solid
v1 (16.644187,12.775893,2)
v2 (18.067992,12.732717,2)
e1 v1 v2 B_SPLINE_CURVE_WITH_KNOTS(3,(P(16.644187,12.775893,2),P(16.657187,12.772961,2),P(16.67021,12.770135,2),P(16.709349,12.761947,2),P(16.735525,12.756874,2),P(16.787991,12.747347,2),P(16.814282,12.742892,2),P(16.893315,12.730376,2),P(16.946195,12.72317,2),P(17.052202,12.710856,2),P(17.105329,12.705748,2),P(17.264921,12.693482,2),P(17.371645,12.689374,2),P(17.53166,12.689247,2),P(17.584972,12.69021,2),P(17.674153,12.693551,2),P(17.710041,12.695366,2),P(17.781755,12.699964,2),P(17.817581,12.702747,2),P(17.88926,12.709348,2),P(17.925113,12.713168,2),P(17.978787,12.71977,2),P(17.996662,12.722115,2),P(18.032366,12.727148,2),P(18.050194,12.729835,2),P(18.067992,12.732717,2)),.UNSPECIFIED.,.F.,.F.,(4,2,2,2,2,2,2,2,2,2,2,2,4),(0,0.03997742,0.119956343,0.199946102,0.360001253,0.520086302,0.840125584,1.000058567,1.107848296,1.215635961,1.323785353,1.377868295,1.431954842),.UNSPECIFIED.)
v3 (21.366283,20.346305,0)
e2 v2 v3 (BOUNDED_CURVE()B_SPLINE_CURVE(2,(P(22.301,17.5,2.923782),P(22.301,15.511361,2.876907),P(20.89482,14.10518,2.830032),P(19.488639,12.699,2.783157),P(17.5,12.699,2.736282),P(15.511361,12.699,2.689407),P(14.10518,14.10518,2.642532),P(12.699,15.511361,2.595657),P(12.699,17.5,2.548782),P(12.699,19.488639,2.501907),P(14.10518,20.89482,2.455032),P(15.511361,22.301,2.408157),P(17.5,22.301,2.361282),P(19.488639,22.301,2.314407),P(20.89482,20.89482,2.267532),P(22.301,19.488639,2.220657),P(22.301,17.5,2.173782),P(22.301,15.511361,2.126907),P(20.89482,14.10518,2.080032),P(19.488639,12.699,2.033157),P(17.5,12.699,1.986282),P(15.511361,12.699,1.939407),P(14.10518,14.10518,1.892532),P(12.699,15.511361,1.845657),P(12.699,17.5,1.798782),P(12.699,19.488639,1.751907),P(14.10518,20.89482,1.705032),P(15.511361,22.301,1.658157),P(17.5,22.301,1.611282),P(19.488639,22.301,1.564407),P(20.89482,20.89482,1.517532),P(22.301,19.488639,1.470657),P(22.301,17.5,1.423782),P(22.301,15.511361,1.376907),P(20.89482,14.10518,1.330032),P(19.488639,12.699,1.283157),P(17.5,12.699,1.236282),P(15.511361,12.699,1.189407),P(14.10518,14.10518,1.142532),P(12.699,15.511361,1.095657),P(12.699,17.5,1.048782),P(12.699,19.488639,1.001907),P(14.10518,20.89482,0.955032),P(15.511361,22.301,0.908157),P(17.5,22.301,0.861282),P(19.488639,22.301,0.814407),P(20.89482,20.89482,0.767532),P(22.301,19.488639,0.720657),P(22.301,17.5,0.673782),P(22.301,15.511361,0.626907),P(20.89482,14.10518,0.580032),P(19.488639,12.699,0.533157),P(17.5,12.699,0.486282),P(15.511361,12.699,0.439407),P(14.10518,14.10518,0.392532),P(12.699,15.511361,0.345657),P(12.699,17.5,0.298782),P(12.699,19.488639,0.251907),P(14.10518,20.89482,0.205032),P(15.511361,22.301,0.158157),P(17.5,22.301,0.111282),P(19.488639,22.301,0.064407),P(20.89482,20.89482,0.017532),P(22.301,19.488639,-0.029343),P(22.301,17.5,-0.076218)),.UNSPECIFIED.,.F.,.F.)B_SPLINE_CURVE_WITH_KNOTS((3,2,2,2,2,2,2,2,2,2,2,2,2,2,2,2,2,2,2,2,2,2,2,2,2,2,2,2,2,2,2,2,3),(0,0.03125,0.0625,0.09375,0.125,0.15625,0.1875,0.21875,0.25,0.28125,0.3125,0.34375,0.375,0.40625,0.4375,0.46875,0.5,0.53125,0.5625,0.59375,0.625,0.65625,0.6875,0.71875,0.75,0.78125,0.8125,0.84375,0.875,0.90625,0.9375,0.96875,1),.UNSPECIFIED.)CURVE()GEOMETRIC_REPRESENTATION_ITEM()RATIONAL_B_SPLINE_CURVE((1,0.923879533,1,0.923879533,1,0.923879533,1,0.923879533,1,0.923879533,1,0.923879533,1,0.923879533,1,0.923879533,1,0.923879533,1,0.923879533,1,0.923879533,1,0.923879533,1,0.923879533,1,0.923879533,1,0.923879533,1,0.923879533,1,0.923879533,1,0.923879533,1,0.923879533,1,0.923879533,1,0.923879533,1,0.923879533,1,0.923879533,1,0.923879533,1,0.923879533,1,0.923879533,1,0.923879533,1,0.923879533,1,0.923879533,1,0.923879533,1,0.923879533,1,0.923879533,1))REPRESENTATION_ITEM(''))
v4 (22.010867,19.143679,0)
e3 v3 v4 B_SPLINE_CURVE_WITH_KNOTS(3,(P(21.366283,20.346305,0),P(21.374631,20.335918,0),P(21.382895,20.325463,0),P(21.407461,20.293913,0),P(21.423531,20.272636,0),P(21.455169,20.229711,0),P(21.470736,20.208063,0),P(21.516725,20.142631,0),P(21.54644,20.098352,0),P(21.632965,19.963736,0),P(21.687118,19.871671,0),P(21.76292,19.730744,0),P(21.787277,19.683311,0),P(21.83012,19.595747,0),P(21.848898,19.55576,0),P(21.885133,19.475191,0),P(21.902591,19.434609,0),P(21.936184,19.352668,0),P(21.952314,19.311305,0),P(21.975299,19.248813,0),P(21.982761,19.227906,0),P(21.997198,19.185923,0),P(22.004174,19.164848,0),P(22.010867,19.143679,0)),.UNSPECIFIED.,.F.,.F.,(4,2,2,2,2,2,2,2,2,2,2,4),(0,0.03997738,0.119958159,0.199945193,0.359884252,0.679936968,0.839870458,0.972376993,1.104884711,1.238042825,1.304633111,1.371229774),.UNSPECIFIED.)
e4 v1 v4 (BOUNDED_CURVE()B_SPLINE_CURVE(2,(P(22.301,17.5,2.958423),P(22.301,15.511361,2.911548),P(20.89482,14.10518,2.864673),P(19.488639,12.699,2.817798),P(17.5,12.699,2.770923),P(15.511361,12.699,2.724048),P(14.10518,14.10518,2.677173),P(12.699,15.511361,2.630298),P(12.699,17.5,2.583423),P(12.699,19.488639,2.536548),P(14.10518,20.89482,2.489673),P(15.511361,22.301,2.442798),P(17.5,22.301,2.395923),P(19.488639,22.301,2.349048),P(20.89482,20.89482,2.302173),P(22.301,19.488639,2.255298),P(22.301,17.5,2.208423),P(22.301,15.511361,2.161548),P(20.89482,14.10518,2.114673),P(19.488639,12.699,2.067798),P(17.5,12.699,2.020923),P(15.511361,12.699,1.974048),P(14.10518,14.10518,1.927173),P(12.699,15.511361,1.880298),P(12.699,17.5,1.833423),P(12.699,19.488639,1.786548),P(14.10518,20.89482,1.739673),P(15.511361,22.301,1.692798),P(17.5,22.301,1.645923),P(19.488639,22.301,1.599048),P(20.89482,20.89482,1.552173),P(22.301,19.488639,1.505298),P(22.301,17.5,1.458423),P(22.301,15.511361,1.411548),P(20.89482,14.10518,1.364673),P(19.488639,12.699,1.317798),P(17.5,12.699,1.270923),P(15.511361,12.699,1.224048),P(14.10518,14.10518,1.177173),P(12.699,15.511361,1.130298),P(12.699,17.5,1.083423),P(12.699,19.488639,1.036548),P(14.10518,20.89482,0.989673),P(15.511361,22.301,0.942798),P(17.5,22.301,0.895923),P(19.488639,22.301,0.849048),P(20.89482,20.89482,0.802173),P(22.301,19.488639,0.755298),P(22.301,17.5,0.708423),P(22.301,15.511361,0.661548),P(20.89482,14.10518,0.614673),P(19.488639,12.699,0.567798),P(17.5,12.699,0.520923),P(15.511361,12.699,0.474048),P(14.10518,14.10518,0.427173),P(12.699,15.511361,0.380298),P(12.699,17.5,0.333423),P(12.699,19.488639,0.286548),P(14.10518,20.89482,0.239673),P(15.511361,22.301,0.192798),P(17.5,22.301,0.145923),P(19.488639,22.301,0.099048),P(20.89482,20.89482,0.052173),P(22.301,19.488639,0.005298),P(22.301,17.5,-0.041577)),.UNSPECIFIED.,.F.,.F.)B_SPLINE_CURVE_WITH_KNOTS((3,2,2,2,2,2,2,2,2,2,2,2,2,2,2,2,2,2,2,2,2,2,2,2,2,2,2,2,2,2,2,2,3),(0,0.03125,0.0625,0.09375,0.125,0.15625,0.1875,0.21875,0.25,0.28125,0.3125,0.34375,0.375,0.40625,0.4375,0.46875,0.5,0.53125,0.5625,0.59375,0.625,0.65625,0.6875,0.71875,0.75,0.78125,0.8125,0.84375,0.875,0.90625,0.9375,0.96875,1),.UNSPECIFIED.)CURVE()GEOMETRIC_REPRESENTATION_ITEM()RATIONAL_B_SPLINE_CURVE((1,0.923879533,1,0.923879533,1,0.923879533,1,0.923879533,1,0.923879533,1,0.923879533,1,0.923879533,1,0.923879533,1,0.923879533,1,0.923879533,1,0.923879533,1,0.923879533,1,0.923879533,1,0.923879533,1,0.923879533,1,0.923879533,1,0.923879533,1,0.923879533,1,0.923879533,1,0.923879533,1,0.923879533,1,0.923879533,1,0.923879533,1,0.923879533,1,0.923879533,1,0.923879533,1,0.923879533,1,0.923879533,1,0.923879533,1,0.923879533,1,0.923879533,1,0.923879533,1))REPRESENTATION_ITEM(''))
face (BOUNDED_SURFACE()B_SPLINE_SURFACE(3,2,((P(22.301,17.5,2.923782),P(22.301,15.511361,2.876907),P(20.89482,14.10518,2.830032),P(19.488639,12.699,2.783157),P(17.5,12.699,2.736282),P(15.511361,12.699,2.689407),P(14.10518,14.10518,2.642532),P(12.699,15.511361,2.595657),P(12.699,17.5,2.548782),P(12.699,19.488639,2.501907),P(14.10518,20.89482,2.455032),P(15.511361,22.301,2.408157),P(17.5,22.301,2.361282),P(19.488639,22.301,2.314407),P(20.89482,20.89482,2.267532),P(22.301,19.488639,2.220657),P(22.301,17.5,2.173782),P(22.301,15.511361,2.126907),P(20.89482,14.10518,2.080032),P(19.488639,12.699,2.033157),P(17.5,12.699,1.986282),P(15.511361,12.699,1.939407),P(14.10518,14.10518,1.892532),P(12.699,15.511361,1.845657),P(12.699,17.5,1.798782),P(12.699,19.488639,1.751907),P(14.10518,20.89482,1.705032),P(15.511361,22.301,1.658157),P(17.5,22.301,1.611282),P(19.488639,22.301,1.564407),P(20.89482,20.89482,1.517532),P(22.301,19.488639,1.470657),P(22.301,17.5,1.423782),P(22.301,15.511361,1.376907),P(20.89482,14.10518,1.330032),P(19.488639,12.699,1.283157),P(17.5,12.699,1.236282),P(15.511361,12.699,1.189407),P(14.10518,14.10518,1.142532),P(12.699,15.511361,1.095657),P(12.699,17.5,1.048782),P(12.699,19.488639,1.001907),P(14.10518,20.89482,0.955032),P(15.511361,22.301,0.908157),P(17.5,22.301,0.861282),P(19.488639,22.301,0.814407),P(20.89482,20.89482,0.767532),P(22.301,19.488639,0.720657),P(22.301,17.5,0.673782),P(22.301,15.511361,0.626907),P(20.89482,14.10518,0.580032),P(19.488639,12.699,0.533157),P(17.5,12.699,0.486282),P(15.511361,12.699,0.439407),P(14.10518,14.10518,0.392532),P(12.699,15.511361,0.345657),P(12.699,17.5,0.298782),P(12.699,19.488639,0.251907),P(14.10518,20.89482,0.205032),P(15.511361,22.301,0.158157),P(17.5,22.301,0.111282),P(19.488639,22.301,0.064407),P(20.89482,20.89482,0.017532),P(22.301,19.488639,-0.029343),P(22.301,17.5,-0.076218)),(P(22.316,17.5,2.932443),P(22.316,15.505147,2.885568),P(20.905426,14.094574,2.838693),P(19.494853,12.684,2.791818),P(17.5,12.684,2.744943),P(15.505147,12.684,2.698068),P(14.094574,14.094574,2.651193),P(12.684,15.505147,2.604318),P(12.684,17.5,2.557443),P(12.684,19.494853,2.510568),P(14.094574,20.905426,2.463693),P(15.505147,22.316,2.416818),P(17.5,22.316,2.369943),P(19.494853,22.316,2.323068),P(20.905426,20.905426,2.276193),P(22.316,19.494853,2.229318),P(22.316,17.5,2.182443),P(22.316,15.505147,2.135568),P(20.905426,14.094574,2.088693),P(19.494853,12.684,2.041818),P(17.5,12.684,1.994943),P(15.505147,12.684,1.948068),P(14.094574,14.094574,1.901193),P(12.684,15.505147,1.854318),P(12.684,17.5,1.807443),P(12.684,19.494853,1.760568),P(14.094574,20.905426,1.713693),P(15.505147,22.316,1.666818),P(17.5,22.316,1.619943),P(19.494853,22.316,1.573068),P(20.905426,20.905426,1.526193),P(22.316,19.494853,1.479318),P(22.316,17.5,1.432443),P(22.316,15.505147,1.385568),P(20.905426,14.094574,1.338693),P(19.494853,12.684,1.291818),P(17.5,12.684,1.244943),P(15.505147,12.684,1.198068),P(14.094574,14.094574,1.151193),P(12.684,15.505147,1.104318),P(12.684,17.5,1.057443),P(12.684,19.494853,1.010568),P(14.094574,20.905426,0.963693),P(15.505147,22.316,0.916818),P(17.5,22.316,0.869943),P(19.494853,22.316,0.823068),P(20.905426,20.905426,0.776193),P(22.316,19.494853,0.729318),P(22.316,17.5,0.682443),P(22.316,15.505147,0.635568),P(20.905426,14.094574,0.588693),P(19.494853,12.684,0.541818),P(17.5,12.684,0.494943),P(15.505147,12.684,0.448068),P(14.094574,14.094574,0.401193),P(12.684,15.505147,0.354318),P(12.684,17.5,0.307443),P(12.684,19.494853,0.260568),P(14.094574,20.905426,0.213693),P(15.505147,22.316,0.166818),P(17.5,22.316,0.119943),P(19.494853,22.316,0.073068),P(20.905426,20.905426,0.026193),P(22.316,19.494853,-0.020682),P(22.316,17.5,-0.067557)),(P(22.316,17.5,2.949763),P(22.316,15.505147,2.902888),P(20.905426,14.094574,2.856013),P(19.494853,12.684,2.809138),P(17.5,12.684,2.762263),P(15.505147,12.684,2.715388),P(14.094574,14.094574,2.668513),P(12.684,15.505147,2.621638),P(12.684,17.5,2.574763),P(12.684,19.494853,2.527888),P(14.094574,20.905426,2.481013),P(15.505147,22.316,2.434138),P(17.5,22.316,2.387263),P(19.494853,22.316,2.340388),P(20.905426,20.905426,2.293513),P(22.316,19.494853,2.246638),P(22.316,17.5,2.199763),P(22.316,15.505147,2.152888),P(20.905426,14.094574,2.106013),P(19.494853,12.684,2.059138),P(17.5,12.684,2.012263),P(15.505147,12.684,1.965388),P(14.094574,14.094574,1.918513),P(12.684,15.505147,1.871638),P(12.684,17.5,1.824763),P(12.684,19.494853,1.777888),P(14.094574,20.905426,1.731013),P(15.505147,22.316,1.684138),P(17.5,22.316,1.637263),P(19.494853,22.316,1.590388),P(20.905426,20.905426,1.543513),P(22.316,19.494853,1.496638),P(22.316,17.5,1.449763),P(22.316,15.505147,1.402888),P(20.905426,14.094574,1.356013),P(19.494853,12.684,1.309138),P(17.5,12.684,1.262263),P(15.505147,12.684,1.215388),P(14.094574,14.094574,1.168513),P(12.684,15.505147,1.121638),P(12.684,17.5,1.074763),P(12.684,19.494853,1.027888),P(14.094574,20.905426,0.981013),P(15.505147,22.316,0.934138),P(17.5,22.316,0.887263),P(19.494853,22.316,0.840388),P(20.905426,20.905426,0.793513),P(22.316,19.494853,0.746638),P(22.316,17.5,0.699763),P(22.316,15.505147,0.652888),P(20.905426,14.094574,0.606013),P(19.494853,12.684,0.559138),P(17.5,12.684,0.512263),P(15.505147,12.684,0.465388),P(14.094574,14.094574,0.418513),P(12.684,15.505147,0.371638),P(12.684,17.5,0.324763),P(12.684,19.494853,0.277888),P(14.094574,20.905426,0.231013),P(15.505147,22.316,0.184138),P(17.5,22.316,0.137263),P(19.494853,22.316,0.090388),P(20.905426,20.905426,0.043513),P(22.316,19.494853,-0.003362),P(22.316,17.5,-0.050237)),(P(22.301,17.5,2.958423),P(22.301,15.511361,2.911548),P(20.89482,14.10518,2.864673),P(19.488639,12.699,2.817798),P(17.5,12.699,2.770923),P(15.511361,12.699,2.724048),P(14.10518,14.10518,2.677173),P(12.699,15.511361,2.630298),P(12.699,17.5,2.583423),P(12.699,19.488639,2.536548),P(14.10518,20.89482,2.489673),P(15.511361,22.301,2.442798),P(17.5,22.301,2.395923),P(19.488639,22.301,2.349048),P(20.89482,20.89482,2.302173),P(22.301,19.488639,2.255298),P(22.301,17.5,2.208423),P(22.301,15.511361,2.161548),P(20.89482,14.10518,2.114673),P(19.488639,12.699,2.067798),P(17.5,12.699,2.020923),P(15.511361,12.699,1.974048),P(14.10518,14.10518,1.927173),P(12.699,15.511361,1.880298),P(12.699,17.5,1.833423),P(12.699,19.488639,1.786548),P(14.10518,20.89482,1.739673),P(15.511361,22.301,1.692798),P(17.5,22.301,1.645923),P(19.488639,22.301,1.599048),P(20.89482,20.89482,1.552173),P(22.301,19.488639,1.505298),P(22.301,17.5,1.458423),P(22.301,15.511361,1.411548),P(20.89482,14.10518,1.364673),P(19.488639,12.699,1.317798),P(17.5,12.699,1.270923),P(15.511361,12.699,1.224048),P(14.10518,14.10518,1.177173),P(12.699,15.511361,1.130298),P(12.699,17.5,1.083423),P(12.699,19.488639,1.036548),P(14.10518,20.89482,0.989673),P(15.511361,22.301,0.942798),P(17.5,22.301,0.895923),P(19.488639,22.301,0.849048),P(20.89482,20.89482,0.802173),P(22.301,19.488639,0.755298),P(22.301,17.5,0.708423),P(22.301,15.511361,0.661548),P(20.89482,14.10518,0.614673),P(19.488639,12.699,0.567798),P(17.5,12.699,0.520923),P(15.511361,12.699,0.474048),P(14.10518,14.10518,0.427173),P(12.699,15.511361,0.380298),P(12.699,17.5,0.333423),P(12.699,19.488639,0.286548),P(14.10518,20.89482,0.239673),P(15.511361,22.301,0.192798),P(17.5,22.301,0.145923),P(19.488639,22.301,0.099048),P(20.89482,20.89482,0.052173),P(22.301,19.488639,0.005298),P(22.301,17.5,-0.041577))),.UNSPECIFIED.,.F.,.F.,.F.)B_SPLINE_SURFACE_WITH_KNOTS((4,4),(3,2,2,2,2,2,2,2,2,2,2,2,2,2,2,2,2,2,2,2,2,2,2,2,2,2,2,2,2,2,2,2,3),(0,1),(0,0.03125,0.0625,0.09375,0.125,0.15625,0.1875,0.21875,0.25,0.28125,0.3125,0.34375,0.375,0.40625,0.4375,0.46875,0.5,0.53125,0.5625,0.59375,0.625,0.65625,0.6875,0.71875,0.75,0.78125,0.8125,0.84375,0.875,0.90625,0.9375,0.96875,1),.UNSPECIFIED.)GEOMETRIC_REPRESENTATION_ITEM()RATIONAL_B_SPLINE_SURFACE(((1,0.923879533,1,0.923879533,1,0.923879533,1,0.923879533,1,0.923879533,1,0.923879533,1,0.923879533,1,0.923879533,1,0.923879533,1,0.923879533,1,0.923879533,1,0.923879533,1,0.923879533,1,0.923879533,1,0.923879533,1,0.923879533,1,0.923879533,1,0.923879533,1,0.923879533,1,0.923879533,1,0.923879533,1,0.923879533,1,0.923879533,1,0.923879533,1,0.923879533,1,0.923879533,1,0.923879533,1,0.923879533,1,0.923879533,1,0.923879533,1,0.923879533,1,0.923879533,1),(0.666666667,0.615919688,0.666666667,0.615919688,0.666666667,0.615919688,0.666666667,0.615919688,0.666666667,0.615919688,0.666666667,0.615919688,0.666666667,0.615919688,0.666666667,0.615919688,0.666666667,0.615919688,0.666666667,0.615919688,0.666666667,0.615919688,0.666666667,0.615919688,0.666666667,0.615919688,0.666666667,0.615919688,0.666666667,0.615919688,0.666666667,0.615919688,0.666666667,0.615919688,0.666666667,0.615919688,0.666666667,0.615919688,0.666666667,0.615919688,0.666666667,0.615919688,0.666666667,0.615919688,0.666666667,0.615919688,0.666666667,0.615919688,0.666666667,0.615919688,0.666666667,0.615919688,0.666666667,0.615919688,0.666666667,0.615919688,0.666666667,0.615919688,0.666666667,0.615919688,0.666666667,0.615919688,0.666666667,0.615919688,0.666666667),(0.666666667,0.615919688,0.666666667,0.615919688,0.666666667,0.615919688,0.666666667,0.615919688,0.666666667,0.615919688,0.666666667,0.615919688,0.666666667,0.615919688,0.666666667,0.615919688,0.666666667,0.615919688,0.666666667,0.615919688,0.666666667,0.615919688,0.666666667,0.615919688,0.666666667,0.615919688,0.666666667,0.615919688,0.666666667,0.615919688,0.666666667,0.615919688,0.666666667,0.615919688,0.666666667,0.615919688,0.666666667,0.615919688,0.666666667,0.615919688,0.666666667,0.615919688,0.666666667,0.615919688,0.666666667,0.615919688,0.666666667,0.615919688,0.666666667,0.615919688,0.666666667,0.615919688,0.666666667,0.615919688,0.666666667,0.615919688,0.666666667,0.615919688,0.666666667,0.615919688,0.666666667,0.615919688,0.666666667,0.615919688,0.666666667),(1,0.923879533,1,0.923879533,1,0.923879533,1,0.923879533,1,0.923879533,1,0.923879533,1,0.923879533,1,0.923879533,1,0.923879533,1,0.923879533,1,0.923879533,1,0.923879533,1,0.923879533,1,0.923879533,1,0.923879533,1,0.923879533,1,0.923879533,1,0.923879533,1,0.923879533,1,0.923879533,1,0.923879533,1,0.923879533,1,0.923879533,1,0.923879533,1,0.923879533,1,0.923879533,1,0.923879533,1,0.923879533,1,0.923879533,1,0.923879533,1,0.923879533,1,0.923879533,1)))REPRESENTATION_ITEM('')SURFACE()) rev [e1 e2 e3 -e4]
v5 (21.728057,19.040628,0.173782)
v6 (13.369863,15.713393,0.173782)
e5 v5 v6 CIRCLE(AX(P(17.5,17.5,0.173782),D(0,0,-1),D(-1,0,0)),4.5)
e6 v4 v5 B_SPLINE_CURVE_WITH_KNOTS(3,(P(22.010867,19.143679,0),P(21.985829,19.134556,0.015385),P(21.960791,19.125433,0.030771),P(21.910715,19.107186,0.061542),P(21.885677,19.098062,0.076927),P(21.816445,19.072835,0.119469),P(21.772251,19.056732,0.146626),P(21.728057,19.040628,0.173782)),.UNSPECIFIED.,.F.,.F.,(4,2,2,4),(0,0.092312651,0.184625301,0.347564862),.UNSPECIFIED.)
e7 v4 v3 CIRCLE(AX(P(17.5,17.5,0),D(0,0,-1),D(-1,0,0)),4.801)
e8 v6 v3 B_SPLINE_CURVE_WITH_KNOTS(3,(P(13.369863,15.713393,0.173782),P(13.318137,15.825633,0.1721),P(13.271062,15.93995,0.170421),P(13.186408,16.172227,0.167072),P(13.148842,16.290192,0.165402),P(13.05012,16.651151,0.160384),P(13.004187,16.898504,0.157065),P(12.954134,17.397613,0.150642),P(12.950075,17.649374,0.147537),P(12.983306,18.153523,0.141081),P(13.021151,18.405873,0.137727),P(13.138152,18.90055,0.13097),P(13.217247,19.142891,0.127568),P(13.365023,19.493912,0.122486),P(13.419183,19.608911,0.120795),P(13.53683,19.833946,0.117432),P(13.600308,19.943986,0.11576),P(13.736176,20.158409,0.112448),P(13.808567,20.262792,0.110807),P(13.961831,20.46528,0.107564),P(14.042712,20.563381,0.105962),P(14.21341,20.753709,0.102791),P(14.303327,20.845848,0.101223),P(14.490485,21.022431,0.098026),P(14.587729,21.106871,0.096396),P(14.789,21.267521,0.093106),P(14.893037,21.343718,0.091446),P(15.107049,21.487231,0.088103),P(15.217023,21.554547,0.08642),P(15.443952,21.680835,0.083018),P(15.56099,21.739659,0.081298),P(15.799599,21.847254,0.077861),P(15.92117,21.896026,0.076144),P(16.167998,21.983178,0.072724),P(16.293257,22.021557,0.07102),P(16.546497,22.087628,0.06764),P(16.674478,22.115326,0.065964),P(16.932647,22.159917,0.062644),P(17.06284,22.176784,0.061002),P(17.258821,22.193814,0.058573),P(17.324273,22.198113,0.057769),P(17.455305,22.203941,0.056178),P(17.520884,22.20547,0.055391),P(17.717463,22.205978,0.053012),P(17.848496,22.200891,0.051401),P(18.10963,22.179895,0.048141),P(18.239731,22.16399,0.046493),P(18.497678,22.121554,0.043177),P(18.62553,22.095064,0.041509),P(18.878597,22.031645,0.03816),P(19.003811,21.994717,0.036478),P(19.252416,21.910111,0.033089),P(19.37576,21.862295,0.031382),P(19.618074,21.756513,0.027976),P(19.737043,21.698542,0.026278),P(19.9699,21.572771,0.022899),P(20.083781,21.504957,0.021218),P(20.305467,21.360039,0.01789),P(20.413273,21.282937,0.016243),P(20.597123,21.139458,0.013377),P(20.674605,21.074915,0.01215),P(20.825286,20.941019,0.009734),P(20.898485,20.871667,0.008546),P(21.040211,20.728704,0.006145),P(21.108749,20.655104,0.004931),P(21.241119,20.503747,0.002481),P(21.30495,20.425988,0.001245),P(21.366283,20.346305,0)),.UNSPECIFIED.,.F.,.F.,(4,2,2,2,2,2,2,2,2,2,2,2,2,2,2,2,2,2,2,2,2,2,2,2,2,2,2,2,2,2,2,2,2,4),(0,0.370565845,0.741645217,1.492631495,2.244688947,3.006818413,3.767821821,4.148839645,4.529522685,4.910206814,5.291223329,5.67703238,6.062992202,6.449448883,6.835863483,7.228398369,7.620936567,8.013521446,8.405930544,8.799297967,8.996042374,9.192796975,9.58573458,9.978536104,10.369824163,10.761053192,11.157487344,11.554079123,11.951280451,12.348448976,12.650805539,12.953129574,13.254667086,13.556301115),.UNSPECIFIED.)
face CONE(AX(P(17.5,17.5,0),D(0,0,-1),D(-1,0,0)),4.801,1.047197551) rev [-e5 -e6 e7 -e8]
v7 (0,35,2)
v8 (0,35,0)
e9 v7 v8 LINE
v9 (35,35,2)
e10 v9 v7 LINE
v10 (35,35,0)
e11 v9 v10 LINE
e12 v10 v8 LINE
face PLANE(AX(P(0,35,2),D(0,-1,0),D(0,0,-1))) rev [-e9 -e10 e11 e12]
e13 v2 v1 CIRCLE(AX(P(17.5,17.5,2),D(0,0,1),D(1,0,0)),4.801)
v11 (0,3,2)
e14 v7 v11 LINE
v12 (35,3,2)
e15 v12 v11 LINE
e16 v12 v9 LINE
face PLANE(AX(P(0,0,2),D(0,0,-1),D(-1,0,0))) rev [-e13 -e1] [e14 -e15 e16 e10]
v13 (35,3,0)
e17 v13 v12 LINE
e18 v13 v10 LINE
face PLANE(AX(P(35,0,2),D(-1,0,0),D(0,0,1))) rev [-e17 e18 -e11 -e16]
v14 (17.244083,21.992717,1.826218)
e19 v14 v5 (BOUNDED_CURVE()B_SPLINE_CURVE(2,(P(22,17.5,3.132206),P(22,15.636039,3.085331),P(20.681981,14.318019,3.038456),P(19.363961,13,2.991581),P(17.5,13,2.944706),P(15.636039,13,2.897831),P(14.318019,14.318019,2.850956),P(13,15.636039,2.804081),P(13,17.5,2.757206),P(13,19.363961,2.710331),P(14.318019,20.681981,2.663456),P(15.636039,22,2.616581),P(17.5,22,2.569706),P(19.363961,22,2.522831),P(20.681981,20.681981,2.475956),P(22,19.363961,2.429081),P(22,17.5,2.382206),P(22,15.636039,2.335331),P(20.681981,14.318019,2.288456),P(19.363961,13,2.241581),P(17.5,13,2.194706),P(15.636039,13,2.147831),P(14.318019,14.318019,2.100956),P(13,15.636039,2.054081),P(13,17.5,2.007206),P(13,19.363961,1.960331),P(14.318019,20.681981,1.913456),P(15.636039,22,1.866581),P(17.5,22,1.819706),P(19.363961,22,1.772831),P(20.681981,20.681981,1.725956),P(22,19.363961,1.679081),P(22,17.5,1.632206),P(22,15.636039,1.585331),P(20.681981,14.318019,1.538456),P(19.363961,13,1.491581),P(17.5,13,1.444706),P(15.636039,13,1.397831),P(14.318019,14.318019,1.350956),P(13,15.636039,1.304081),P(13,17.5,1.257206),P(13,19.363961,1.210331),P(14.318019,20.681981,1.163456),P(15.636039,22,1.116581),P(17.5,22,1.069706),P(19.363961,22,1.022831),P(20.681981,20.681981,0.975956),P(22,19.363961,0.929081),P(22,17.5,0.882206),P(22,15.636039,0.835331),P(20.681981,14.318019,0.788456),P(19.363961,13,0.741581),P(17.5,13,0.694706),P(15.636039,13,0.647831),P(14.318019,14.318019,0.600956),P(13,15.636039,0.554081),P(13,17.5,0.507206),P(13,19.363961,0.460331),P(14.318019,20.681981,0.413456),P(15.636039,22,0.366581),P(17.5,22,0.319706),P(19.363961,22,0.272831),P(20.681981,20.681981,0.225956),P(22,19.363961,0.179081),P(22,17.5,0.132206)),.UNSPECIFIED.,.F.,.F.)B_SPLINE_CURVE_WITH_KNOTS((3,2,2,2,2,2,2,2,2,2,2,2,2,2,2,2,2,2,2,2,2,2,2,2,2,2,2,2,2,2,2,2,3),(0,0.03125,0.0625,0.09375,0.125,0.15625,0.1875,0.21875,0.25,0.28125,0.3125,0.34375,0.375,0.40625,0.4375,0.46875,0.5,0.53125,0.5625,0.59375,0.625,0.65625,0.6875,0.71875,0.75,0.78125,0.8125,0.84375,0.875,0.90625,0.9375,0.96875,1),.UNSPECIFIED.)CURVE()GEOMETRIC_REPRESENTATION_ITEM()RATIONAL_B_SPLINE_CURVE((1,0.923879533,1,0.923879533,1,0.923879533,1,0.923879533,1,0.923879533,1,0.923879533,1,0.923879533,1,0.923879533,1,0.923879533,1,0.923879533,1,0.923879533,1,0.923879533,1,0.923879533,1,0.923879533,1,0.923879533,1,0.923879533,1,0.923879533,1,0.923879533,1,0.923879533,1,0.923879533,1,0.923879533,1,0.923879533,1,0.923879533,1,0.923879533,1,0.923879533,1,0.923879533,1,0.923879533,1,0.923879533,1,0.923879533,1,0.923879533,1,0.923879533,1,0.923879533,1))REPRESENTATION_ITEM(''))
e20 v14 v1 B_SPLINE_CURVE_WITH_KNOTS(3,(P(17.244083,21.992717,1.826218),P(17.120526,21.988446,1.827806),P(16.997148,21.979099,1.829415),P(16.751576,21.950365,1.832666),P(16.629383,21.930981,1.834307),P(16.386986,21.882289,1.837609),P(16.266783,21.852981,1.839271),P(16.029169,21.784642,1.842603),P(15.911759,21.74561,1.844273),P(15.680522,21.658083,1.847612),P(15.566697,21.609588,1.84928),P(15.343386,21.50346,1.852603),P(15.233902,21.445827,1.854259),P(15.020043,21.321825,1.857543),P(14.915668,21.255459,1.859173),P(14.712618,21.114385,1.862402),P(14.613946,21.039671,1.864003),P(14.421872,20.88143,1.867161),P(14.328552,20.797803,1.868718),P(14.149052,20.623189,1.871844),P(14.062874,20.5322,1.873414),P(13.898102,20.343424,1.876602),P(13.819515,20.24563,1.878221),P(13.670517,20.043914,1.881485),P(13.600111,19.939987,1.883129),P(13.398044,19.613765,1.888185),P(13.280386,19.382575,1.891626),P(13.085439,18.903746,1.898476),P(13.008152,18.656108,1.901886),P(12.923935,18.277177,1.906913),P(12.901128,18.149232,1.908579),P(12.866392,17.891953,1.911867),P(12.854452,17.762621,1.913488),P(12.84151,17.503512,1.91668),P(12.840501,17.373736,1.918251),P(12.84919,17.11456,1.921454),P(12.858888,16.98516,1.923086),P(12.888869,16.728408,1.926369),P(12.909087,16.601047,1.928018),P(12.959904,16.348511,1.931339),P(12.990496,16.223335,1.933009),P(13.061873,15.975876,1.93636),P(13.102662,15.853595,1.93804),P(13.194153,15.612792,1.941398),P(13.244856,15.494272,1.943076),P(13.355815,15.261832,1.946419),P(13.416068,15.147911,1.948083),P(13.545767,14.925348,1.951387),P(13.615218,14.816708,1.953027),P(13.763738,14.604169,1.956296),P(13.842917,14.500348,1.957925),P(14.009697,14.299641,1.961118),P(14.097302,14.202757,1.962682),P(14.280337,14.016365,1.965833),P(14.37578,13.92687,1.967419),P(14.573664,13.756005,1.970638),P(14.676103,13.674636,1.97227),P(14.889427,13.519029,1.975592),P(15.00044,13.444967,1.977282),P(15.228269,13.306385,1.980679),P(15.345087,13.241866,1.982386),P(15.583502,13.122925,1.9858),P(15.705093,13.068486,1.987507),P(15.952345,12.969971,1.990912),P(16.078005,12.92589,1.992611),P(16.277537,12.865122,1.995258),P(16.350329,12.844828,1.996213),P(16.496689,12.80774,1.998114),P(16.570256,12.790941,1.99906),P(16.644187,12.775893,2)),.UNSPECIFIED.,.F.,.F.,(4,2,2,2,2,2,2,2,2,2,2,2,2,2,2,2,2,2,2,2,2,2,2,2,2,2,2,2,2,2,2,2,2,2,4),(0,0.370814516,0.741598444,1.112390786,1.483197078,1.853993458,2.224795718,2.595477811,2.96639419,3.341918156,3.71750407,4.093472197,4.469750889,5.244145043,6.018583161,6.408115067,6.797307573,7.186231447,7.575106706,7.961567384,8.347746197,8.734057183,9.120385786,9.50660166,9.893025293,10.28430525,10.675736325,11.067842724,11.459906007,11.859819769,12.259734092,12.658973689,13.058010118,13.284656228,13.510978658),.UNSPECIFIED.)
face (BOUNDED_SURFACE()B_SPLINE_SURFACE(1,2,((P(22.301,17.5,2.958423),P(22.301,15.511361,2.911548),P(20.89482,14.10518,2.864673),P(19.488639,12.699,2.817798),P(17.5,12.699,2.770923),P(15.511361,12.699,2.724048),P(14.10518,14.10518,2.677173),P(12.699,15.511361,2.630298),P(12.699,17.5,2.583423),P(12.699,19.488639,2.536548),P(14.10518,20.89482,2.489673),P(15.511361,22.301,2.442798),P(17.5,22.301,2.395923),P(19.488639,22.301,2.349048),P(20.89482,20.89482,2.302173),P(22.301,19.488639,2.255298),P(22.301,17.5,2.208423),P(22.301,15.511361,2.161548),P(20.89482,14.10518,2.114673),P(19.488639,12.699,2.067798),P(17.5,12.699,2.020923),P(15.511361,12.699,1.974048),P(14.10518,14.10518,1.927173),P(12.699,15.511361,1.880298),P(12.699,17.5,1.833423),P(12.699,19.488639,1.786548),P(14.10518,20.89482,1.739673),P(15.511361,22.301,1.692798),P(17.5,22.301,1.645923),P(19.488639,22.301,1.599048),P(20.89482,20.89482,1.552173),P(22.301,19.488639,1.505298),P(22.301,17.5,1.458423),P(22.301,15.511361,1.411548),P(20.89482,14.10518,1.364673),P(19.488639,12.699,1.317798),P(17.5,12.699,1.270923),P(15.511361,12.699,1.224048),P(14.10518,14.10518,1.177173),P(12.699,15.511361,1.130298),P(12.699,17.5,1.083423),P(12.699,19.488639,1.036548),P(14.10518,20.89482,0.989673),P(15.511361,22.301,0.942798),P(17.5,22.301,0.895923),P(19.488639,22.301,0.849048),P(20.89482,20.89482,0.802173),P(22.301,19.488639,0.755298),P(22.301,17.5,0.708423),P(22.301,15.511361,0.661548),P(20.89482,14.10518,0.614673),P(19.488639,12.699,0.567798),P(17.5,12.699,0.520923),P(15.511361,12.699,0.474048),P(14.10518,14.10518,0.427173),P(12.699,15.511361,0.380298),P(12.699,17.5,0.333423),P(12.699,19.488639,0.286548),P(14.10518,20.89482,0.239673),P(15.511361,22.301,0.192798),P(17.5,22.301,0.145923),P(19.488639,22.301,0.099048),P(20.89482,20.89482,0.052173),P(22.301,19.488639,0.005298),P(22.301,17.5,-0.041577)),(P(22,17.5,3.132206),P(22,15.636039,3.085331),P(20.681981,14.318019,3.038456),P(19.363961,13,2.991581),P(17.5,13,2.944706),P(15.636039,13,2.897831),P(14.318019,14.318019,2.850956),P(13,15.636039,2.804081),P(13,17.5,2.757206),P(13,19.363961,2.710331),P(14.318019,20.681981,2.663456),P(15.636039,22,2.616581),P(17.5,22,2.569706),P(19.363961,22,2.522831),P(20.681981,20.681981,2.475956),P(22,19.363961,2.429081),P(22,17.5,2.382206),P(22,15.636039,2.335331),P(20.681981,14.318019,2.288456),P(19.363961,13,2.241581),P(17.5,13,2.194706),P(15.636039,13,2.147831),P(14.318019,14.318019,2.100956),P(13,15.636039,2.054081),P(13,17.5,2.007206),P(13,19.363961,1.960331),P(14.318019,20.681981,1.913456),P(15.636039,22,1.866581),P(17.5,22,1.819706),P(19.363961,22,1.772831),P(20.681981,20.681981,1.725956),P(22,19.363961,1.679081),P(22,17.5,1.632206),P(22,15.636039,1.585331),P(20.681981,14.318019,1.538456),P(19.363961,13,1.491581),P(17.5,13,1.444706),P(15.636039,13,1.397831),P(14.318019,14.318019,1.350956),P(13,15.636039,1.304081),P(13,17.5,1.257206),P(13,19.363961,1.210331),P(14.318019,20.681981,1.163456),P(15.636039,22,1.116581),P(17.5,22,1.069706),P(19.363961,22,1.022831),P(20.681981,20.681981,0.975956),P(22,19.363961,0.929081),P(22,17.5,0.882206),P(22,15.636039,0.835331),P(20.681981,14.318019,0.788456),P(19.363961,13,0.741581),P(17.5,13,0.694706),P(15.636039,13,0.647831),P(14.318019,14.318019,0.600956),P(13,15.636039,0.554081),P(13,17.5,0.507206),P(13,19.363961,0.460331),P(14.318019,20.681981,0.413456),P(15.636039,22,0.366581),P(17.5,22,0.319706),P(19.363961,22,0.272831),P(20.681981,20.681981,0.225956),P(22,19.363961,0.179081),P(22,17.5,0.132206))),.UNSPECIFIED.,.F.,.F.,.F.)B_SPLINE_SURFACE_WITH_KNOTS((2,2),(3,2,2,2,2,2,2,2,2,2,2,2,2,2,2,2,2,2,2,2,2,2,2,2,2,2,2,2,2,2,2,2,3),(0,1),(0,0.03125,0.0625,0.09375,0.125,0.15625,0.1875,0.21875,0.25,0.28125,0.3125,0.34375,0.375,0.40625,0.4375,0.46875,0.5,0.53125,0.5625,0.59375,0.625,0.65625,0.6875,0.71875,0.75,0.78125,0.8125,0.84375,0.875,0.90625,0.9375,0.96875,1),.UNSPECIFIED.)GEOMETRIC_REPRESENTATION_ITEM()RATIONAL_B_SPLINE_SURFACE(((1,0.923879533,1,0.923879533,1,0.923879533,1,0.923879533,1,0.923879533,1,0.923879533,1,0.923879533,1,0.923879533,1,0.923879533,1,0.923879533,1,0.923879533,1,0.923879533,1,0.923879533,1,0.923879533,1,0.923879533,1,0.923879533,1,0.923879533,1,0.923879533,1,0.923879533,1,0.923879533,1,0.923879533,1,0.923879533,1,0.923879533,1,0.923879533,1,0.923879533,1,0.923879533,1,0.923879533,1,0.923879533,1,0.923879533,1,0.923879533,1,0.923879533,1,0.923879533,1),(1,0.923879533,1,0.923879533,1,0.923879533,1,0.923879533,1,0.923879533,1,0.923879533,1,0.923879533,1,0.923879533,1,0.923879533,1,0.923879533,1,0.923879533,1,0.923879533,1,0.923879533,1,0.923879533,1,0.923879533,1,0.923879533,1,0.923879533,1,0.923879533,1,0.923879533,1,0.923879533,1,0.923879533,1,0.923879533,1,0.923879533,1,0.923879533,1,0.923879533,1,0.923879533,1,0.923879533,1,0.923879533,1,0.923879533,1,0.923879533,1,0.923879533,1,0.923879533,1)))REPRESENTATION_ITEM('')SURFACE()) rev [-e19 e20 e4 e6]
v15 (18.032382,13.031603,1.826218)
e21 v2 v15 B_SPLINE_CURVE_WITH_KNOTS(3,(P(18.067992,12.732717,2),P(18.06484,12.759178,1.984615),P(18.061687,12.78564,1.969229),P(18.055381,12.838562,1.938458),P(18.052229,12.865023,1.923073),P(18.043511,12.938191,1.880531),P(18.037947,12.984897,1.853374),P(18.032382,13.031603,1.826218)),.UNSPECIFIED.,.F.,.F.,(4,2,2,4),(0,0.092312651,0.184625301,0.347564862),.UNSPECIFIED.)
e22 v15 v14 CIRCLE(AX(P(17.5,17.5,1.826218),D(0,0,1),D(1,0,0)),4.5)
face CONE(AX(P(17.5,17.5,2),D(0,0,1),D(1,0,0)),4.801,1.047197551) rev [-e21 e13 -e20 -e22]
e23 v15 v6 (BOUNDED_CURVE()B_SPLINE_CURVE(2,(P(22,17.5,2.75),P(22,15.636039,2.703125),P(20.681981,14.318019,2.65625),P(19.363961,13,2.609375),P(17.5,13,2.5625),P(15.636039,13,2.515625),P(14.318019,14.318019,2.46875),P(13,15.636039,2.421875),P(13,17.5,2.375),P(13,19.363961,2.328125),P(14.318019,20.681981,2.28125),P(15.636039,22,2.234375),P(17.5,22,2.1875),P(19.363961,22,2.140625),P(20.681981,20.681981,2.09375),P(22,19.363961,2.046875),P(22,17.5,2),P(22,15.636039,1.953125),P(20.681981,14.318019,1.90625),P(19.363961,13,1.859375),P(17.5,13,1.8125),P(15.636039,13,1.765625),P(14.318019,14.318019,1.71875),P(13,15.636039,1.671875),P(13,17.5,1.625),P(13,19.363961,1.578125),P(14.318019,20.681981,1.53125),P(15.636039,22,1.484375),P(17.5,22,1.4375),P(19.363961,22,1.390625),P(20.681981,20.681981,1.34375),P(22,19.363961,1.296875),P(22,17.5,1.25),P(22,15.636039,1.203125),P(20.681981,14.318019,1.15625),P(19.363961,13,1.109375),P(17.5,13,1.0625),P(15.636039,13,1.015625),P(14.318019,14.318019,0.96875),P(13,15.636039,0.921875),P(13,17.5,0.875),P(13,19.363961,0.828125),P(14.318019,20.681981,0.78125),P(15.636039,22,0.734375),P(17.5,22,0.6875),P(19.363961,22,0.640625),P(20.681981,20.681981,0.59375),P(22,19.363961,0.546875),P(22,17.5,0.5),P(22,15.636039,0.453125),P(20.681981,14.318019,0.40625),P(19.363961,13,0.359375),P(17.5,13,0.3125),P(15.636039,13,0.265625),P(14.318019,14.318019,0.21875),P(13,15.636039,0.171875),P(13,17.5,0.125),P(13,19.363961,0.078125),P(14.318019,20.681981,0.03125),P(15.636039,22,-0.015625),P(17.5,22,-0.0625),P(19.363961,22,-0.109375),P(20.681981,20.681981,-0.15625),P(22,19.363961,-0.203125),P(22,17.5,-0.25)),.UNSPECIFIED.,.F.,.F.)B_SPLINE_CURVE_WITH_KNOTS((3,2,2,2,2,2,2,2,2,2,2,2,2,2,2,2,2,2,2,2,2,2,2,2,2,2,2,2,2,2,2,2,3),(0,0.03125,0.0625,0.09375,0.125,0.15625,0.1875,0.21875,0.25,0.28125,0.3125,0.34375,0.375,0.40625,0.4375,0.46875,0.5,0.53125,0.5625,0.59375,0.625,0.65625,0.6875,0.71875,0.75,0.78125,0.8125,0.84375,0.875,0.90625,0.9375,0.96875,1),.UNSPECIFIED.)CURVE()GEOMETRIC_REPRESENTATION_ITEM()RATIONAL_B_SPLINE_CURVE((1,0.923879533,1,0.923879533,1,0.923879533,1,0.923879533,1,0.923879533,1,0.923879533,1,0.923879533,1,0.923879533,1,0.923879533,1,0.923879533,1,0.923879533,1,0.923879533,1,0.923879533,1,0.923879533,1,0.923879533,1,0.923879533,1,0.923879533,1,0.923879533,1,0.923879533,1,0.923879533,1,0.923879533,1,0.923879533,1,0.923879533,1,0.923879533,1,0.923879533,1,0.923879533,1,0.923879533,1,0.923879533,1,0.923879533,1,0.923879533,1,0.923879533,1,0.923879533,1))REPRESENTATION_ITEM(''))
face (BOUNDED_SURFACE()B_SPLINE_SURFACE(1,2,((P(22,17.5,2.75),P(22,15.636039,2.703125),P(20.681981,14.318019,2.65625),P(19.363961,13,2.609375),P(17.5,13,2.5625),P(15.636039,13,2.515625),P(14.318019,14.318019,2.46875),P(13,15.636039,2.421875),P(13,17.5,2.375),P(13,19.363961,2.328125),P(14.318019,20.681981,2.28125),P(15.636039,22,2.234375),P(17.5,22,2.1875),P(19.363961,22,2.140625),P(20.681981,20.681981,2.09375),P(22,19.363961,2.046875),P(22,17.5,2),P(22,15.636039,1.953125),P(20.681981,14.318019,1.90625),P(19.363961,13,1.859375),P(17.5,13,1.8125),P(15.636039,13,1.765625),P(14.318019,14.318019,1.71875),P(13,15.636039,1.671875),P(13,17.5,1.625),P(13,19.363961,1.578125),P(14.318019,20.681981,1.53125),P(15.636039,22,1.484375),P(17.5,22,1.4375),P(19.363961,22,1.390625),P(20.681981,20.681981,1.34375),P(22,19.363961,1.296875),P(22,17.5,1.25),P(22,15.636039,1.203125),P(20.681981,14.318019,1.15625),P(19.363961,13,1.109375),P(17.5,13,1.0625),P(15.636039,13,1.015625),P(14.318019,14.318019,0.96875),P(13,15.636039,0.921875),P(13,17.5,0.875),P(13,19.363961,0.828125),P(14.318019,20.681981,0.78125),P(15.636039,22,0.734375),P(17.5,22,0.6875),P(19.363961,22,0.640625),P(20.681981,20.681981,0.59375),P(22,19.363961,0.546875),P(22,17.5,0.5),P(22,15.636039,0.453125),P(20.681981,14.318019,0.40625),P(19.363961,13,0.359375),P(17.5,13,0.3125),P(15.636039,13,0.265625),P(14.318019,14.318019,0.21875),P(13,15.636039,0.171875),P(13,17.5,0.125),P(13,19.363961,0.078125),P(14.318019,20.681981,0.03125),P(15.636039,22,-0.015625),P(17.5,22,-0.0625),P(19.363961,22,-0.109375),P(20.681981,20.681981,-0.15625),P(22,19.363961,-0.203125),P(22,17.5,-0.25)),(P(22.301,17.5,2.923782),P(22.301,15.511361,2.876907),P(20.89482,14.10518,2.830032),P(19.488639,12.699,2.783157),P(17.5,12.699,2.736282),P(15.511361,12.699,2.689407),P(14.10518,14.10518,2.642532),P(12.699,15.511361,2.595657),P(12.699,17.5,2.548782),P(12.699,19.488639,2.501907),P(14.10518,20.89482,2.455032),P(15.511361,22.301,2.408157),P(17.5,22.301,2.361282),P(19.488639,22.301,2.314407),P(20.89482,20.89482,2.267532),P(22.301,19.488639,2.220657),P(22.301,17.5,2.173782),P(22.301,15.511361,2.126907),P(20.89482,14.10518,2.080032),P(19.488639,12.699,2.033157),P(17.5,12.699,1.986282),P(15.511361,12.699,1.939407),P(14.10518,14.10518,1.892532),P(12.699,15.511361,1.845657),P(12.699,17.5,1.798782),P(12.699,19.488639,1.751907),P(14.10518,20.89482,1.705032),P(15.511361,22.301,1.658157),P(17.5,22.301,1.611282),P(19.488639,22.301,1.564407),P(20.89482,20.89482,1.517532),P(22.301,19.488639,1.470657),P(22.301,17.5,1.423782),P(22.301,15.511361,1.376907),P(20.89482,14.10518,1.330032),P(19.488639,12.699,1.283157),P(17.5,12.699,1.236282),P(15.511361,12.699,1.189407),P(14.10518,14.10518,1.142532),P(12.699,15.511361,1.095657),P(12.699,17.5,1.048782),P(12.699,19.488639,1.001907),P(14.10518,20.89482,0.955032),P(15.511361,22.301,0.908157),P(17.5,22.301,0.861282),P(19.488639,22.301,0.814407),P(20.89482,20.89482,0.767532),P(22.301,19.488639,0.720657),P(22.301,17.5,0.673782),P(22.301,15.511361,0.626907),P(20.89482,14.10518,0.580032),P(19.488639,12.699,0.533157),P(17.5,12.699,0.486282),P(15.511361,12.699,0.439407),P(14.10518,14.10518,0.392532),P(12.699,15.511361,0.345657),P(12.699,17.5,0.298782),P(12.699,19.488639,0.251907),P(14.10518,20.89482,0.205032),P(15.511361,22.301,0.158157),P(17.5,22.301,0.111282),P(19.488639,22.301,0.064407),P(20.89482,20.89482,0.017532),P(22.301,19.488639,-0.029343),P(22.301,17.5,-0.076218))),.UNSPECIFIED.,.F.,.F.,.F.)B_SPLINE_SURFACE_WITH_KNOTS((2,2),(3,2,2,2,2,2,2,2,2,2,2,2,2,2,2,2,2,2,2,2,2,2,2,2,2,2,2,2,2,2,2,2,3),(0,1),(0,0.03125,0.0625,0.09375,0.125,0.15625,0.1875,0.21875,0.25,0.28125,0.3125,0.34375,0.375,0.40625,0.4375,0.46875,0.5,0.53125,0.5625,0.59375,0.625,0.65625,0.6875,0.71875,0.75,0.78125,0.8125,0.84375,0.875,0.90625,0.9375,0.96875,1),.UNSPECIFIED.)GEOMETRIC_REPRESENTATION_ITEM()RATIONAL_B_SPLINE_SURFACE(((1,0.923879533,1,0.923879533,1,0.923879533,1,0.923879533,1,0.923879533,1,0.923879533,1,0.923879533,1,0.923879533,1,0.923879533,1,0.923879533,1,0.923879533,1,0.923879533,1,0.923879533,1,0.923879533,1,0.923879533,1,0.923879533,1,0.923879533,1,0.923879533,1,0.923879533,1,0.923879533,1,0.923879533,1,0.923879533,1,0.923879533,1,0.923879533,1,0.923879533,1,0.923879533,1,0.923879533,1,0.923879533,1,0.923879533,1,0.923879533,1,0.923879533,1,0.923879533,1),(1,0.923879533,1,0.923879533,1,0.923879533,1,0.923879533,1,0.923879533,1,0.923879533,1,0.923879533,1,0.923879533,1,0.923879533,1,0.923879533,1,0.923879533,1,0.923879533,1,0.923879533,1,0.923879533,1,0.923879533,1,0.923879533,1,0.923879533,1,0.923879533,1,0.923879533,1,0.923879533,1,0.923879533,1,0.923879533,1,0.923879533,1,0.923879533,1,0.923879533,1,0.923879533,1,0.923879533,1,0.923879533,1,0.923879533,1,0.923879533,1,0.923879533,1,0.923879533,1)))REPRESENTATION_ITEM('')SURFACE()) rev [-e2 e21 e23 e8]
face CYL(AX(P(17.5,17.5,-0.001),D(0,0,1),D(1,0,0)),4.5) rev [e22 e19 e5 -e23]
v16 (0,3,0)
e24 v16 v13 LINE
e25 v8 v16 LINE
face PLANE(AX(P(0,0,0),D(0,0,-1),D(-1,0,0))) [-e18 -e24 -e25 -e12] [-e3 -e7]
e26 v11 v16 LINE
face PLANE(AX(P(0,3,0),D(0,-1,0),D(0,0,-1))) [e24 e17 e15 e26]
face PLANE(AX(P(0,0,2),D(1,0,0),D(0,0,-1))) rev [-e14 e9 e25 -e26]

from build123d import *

# Parameters (mm, degrees)
SKETCH1_W           = 35
SKETCH1_H           = 35
BOSS_EXTRUDE1_DEPTH = 2
CUT_EXTRUDE1_REACH  = 51.538
SKETCH2_R           = 4.5
CUT_SWEEP9_PITCH    = 0.75
SKETCH26_W          = 35
SKETCH26_H          = 2
CUT_EXTRUDE4_DEPTH  = 3


with BuildPart() as part:
    # Sketch1 → Boss-Extrude1 (new body)
    with BuildSketch(Plane.XY):
        with Locations((17.5, 17.5)):
            Rectangle(SKETCH1_W, SKETCH1_H)
    extrude(amount=BOSS_EXTRUDE1_DEPTH)

    # Sketch2 → Cut-Extrude1 (cut, up to next)
    with BuildSketch(Plane.XY.offset(2), mode=Mode.PRIVATE) as cut_extrude1_sk1:
        with Locations((17.5, 17.5)):
            Circle(SKETCH2_R)
    cut_extrude1_tool1 = extrude(cut_extrude1_sk1.sketch, amount=-CUT_EXTRUDE1_REACH, mode=Mode.PRIVATE) & part.part
    add(cut_extrude1_tool1.solids().sort_by_distance((17.5, 17.5, 2))[0], mode=Mode.SUBTRACT)

    # Cut-Sweep9: the profile of Sketch22 profile screwed along a right-hand helix of 3 turns, 8 arcs to a turn; built about Z, then put on its axis
    cut_sweep9_z = Axis((0, 0, 0), (0, 0, 1))
    cut_sweep9_corners = [(4.4997, 0, -0.382379083), (4.4997, 0, 0.000173205), (4.801, 0, -0.173782431), (4.811, 0, -0.191102939), (4.801, 0, -0.208423447)]
    with BuildLine(mode=Mode.PRIVATE) as cut_sweep9_profile:
        Line(cut_sweep9_corners[0], cut_sweep9_corners[1])
        Line(cut_sweep9_corners[1], cut_sweep9_corners[2])
        Line(cut_sweep9_corners[4], cut_sweep9_corners[0])
        ThreePointArc((4.801, 0, -0.173782431), (4.808320508, 0, -0.181102939), (4.811, 0, -0.191102939))
        ThreePointArc((4.811, 0, -0.191102939), (4.808320508, 0, -0.201102939), (4.801, 0, -0.208423447))
    cut_sweep9_cap = Face(cut_sweep9_profile.wire())
    cut_sweep9_arcs = [((4.801, 0, -0.173782431), (4.811, 0, -0.179555934), (4.811, 0, -0.191102939), (1, 0.8660254037844068, 1)), ((4.811, 0, -0.191102939), (4.811, 0, -0.202649944), (4.801, 0, -0.208423447), (1, 0.8660254037844068, 1))]  # start, shoulder, end, weights
    cut_sweep9_turn_angles = [0, 22.5, 45, 67.5, 90, 112.5, 135, 157.5, 180, 202.5, 225, 247.5, 270, 292.5, 315, 337.5, 360]
    cut_sweep9_turn_weights = [1, 0.9238795325112867, 1, 0.9238795325112867, 1, 0.9238795325112867, 1, 0.9238795325112867, 1, 0.9238795325112867, 1, 0.9238795325112867, 1, 0.9238795325112867, 1, 0.9238795325112867, 1]
    cut_sweep9_turn_rails = [Edge.make_bspline([Vector(p[0], p[1], 0).rotate(cut_sweep9_z, cut_sweep9_turn_angles[k]) / cut_sweep9_turn_weights[k] + Vector(0, 0, p[2] + CUT_SWEEP9_PITCH * cut_sweep9_turn_angles[k] / 360) for k in range(17)], [0, 0, 0, 1, 1, 2, 2, 3, 3, 4, 4, 5, 5, 6, 6, 7, 7, 8, 8, 8], 2, cut_sweep9_turn_weights) for p in cut_sweep9_corners]
    cut_sweep9_turn_sides = [*[Face.make_surface_from_curves(cut_sweep9_turn_rails[p[0]], cut_sweep9_turn_rails[p[1]]) for p in [(0, 1), (1, 2), (4, 0)]], *[Face.make_bezier_surface([[Vector(p[j][0], p[j][1], 0).rotate(cut_sweep9_z, cut_sweep9_turn_angles[2 * i + k]) / cut_sweep9_turn_weights[2 * i + k] + Vector(0, 0, p[j][2] + CUT_SWEEP9_PITCH * cut_sweep9_turn_angles[2 * i + k] / 360) for k in range(3)] for j in range(3)], [[p[3][j] * cut_sweep9_turn_weights[2 * i + k] for k in range(3)] for j in range(3)]) for p in cut_sweep9_arcs for i in range(8)]]
    cut_sweep9 = Plane(origin=(17.5, 17.5, 2), x_dir=(1, 0, 0), z_dir=(0, 0, -1)) * Solid(Shell([*[p.moved(Location((0, 0, CUT_SWEEP9_PITCH * i))) for i in range(3) for p in cut_sweep9_turn_sides], cut_sweep9_cap, cut_sweep9_cap.rotate(cut_sweep9_z, 1080).moved(Location((0, 0, CUT_SWEEP9_PITCH * 1080 / 360)))]))
    add(cut_sweep9, mode=Mode.SUBTRACT)

    # Cut-Extrude2 cone 1 section (through the dimple's axis) → Cut-Extrude2 (revolve, cut)
    with BuildSketch(Plane(origin=(17.5, 17.5, 2), x_dir=(0, -1, 0), z_dir=(1, 0, 0))):
        Polygon((0, 0), (4.801, 0), (0, 2.771858642), align=None)
    revolve(axis=Axis((17.5, 17.5, 2), (0, 0, -1)), mode=Mode.SUBTRACT)

    # Cut-Extrude3 cone 1 section (through the dimple's axis) → Cut-Extrude3 (revolve, cut)
    with BuildSketch(Plane(origin=(17.5, 17.5, 0), x_dir=(0, 1, 0), z_dir=(1, 0, 0))):
        Polygon((0, 0), (4.801, 0), (0, 2.771858642), align=None)
    revolve(axis=Axis((17.5, 17.5, 0), (0, 0, 1)), mode=Mode.SUBTRACT)

    # Sketch26 → Cut-Extrude4 (cut)
    with BuildSketch(Plane.XZ):
        with Locations((17.5, 1)):
            Rectangle(SKETCH26_W, SKETCH26_H)
    extrude(amount=-CUT_EXTRUDE4_DEPTH, mode=Mode.SUBTRACT)


solid = part.part
